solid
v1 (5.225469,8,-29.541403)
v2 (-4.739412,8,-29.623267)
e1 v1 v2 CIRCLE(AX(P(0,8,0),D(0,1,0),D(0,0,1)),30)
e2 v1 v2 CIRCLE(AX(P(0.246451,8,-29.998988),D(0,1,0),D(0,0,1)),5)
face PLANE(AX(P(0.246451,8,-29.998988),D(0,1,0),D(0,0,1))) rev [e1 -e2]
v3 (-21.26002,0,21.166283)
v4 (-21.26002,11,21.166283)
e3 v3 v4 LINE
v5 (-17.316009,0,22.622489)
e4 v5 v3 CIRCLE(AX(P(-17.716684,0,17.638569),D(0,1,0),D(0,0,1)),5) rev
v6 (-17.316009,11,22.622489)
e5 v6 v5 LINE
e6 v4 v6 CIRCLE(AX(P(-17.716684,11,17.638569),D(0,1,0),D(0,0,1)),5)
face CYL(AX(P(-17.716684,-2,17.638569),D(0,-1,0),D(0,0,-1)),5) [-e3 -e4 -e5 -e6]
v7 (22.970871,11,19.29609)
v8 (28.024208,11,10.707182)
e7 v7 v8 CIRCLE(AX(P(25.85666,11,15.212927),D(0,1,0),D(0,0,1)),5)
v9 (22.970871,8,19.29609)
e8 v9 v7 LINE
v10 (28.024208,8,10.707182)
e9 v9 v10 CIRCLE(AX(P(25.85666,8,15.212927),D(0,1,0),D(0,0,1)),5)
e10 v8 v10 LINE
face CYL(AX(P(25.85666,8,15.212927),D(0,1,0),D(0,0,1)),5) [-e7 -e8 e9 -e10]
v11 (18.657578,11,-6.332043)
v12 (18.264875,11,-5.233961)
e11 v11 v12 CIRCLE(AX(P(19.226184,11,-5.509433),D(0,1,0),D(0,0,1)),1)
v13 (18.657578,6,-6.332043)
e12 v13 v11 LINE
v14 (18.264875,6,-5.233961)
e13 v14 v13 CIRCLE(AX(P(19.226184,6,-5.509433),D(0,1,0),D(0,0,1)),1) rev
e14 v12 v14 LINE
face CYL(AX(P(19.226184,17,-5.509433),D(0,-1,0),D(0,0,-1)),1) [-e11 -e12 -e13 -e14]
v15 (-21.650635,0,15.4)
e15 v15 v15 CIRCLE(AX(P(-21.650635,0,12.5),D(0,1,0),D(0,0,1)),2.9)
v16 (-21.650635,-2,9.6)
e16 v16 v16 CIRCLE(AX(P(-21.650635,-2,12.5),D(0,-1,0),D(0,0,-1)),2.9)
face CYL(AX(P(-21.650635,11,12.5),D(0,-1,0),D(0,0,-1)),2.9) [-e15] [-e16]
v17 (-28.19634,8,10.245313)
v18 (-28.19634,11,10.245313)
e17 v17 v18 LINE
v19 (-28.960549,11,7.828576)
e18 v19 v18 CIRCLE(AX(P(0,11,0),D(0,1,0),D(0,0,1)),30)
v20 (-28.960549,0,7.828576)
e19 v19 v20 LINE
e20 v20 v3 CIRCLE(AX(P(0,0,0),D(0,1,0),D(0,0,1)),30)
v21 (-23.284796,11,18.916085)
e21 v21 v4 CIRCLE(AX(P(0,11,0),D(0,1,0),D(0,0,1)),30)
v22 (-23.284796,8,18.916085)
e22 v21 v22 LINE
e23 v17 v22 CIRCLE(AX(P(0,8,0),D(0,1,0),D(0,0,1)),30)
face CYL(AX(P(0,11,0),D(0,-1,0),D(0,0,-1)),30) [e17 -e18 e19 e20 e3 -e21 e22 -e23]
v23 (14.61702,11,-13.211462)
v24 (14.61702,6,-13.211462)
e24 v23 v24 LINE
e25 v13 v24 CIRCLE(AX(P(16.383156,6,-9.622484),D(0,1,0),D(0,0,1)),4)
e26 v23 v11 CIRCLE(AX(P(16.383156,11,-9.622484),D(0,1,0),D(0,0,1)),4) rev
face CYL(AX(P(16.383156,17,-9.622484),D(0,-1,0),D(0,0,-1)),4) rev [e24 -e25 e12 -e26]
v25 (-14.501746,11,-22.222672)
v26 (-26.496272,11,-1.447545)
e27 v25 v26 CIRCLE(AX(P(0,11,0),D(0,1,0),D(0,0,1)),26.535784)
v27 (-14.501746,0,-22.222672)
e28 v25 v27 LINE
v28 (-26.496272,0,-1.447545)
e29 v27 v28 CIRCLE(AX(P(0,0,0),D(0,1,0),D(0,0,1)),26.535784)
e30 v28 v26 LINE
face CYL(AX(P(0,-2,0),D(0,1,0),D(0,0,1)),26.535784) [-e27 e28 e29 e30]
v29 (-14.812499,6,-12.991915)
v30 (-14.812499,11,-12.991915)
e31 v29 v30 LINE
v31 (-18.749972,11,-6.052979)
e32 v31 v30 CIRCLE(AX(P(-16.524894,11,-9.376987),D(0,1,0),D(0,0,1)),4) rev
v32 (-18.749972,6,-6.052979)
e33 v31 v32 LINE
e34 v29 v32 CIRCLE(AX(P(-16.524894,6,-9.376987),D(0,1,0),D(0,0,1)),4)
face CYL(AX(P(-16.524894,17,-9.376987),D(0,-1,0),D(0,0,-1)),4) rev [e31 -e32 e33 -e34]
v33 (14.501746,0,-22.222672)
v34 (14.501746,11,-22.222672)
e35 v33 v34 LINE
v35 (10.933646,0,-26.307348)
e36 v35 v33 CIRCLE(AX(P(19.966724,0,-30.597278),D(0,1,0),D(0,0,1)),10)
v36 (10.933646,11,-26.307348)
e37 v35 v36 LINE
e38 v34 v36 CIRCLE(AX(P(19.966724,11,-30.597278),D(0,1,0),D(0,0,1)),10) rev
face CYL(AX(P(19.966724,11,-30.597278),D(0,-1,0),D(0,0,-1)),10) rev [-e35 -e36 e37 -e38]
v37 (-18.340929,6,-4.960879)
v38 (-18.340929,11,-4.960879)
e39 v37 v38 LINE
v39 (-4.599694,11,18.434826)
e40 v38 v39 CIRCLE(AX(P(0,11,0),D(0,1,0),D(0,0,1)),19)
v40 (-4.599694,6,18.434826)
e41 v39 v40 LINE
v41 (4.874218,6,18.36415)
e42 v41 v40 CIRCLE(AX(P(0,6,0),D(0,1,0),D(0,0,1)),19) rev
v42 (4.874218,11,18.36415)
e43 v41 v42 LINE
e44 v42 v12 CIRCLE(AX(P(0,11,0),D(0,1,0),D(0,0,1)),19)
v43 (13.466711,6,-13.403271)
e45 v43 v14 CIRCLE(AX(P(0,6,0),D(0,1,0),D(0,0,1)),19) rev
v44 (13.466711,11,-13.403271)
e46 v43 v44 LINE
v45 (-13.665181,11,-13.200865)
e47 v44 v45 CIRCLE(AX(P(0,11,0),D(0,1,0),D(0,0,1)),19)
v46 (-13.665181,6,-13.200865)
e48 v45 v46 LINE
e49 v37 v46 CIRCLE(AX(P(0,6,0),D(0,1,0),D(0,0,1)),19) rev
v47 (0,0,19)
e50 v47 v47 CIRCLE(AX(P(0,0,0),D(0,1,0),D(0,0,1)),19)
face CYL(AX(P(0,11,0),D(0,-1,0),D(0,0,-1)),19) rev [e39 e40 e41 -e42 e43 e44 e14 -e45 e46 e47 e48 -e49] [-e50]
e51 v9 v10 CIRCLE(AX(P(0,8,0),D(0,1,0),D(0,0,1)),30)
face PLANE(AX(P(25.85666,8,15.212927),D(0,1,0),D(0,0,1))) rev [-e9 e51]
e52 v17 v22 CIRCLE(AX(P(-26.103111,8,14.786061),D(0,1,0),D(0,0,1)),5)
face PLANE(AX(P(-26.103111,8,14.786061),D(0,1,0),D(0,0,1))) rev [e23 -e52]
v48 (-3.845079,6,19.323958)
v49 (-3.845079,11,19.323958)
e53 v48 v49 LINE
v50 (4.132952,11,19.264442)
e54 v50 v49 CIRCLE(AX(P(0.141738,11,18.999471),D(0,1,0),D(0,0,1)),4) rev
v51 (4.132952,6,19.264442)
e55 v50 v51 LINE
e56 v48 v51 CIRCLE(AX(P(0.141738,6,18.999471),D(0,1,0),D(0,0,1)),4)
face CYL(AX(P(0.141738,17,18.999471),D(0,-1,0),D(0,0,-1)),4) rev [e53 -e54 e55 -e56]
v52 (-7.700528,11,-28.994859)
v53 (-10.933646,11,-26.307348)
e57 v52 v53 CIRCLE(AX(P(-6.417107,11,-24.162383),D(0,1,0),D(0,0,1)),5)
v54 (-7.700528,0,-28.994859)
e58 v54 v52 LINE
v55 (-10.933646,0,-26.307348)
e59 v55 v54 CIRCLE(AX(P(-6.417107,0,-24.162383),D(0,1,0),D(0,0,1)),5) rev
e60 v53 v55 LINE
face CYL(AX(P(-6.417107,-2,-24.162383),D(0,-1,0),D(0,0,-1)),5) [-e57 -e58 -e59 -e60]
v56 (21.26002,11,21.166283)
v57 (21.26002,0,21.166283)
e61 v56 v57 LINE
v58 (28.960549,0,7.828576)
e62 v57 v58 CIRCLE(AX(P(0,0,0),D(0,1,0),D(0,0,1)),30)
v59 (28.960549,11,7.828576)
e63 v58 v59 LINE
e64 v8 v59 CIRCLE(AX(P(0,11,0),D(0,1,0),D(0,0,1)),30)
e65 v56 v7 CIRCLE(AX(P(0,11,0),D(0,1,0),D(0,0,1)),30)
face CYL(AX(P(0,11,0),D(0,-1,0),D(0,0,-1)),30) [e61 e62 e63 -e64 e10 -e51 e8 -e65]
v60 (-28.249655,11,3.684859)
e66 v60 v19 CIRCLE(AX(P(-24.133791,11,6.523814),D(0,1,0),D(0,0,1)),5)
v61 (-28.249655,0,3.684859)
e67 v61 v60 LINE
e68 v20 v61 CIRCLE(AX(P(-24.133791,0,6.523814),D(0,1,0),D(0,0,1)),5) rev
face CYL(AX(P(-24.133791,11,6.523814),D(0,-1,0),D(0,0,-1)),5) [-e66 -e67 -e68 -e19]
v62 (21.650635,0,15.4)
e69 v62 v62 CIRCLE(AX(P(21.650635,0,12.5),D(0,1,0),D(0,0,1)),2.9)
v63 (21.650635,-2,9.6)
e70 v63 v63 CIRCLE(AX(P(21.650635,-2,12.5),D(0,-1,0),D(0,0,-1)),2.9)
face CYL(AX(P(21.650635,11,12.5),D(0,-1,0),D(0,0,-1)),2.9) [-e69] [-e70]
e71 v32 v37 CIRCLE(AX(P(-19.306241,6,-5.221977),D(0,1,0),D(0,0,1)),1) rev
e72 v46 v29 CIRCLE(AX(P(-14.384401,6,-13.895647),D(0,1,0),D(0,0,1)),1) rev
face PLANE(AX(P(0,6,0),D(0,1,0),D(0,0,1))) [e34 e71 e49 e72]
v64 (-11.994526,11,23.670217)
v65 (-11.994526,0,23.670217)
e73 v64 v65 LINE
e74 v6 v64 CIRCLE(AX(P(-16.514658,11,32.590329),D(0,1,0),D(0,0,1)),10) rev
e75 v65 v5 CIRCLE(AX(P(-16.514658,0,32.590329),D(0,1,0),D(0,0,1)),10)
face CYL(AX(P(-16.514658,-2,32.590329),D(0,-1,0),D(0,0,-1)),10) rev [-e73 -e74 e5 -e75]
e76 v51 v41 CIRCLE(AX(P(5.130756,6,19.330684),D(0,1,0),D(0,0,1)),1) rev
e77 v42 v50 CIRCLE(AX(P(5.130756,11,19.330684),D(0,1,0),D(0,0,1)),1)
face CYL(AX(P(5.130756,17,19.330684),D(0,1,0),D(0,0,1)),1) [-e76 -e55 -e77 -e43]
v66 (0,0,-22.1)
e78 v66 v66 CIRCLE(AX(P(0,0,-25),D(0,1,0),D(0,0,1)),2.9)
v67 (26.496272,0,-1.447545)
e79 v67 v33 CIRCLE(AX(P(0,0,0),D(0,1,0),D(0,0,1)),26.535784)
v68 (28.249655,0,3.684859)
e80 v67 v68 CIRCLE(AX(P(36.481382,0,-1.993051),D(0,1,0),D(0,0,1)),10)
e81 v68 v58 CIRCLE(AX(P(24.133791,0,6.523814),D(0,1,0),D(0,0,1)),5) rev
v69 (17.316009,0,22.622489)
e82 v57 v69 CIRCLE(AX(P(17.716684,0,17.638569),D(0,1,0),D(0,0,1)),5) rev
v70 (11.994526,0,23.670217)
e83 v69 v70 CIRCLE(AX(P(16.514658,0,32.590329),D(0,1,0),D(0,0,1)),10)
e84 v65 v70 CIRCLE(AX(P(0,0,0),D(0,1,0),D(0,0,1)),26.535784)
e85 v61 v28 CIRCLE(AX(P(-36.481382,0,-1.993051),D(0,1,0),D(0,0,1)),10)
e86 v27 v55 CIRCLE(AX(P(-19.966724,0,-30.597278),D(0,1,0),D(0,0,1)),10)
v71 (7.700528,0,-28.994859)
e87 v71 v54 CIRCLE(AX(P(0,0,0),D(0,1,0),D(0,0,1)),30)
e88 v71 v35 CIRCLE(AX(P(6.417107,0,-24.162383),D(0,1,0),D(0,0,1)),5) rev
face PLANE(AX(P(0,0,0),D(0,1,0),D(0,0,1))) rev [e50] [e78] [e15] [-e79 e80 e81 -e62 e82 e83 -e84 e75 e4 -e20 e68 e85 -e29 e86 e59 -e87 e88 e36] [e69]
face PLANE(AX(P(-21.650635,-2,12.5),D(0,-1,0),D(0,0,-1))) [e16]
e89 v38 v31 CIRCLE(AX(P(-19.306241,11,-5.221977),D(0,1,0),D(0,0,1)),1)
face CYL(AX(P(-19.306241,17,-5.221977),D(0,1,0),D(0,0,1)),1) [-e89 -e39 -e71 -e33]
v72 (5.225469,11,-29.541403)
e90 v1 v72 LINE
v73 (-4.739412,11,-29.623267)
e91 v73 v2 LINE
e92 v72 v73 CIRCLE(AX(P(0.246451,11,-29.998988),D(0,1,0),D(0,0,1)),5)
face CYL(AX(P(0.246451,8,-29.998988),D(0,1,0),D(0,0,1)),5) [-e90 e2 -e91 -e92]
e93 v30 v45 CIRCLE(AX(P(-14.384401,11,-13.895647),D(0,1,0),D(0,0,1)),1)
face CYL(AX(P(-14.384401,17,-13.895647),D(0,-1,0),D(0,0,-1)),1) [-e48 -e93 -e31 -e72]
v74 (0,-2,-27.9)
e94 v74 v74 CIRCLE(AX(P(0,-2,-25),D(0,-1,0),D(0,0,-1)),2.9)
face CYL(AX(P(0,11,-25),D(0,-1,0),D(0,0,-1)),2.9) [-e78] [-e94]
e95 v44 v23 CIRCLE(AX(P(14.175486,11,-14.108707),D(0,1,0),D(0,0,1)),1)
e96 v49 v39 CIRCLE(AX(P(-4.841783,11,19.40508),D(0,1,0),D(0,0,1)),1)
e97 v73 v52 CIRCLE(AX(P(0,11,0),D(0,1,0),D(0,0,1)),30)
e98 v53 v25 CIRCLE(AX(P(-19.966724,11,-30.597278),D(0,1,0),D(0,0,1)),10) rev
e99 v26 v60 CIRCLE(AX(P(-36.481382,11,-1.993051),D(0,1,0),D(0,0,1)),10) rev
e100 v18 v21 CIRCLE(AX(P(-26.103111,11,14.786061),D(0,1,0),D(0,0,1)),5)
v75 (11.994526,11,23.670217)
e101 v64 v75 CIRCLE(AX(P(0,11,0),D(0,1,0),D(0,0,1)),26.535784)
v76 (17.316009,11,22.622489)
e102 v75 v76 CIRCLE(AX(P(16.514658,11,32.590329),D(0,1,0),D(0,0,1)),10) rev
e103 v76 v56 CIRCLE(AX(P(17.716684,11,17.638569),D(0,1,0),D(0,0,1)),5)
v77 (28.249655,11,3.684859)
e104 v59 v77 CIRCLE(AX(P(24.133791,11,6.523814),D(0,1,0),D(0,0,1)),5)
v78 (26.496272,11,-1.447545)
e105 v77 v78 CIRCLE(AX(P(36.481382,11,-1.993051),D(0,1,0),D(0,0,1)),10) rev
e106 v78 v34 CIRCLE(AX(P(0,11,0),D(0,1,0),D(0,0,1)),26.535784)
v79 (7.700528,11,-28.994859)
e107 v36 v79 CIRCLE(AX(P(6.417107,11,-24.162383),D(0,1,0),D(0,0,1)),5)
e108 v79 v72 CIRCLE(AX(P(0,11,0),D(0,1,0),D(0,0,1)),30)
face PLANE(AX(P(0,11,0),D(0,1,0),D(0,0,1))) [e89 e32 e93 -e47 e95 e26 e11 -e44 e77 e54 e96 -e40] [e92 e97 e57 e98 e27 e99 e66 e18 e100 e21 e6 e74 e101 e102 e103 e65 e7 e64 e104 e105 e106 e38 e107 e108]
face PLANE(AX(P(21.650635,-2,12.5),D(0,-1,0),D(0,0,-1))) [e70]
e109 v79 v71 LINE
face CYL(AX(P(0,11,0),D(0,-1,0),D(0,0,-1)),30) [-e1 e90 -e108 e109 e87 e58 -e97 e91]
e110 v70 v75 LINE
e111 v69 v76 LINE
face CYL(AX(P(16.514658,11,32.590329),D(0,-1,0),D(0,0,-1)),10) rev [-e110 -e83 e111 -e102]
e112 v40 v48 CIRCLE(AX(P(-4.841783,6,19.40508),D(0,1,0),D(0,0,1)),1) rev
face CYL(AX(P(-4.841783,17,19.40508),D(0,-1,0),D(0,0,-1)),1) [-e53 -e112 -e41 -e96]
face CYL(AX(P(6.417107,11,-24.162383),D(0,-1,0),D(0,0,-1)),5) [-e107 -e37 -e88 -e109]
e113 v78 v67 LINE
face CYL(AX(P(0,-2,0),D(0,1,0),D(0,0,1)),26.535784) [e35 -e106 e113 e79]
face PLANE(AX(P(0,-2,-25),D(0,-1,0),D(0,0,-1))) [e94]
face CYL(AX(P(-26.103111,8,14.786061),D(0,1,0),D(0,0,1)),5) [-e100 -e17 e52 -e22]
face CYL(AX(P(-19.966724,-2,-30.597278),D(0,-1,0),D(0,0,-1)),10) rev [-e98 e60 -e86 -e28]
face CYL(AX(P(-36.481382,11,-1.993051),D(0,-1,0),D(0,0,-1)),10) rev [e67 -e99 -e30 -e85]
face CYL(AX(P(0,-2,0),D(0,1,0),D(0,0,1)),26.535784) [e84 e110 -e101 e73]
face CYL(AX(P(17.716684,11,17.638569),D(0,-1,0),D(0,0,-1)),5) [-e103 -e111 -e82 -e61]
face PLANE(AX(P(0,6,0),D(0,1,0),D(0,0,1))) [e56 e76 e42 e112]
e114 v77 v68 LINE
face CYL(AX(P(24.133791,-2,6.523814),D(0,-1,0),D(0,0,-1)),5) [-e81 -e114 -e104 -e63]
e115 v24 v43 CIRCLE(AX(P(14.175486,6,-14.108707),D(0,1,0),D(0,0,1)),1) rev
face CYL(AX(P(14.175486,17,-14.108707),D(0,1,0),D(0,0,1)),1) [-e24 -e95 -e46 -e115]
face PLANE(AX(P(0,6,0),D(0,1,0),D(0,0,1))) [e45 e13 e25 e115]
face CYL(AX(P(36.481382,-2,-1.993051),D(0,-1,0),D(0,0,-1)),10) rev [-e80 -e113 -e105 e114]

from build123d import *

# Parameters (mm, degrees)
SKETCH1_R                = 19
BOSS_EXTRUDE1_DEPTH      = 3.5
SKETCH2_R                = 30
SKETCH2_R_2              = 19
SKETCH2_R_3              = 2.8
BOSS_EXTRUDE2_DEPTH      = 11
BOSS_EXTRUDE3_DEPTH      = 2
BOSS_EXTRUDE3_DEPTH_BACK = 11
SKETCH4_R                = 2.9
SKETCH5_R                = 5
BOSS_EXTRUDE4_DEPTH      = 3
CUT_EXTRUDE1_START       = -10
SKETCH3_R                = 19
CUT_EXTRUDE1_DEPTH       = 10
CUT_EXTRUDE3_START       = -13
CUT_EXTRUDE3_DEPTH       = 13
FILLET1_R                = 10
FILLET2_R                = 5
CUT_EXTRUDE4_START       = -5
SKETCH8_R                = 4
SKETCH8_R_2              = 19
CUT_EXTRUDE4_DEPTH       = 11
FILLET3_R                = 1


with BuildPart() as part:
    # Sketch1 → Boss-Extrude1 (new body)
    with BuildSketch(Plane(origin=(0, 0, 0), x_dir=(1, 0, 0), z_dir=(0, 1, 0))):
        with Locations(Location((0, 0, 0), (0, 0, 270))):
            Circle(SKETCH1_R)
    extrude(amount=BOSS_EXTRUDE1_DEPTH)

    # Sketch2 → Boss-Extrude2 (add)
    with BuildSketch(Plane(origin=(0, 0, 0), x_dir=(1, 0, 0), z_dir=(0, 1, 0))):
        with Locations(Location((0, 0, 0), (0, 0, 270))):
            Circle(SKETCH2_R)
        with Locations(Location((0, 0, 0), (0, 0, 270))):
            Circle(SKETCH2_R_2, mode=Mode.SUBTRACT)
        with Locations(Location((0, 25, 0), (0, 0, 270))):
            Circle(SKETCH2_R_3, mode=Mode.SUBTRACT)
        with Locations(Location((21.650635095, -12.5, 0), (0, 0, 270))):
            Circle(SKETCH2_R_3, mode=Mode.SUBTRACT)
        with Locations(Location((-21.650635095, -12.5, 0), (0, 0, 270))):
            Circle(SKETCH2_R_3, mode=Mode.SUBTRACT)
    extrude(amount=BOSS_EXTRUDE2_DEPTH)

    # Sketch4 → Boss-Extrude3 (add, two sides: drawn at the far end of the back side and taken through both)
    with BuildSketch(Plane.XZ.offset(-BOSS_EXTRUDE3_DEPTH_BACK)):
        with Locations(Location((-21.650635095, 12.5, 0), (0, 0, 270))):
            Circle(SKETCH4_R)
        with Locations(Location((21.650635095, 12.5, 0), (0, 0, 270))):
            Circle(SKETCH4_R)
        with Locations(Location((0, -25, 0), (0, 0, 270))):
            Circle(SKETCH4_R)
    extrude(amount=BOSS_EXTRUDE3_DEPTH + BOSS_EXTRUDE3_DEPTH_BACK)

    # Sketch5 → Boss-Extrude4 (add)
    with BuildSketch(Plane(origin=(0, 11, 0), x_dir=(1, 0, 0), z_dir=(0, 1, 0))):
        with Locations((-26.103110985, -14.7860609)):
            Circle(SKETCH5_R)
        with Locations((0.246451131, 29.99898768)):
            Circle(SKETCH5_R)
        with Locations((25.856659853, -15.212926781)):
            Circle(SKETCH5_R)
    extrude(amount=-BOSS_EXTRUDE4_DEPTH)

    # Sketch3 → Cut-Extrude1 (cut)
    with BuildSketch(Plane(origin=(0, 3.5, 0), x_dir=(1, 0, 0), z_dir=(0, 1, 0)).offset(CUT_EXTRUDE1_START)):
        with Locations(Location((0, 0, 0), (0, 0, 270))):
            Circle(SKETCH3_R)
    extrude(amount=CUT_EXTRUDE1_DEPTH, mode=Mode.SUBTRACT)

    # Sketch7 → Cut-Extrude3 (cut)
    with BuildSketch(Plane(origin=(0, 11, 0), x_dir=(1, 0, 0), z_dir=(0, 1, 0)).offset(CUT_EXTRUDE3_START)):
        with BuildLine():
            ThreePointArc((-29.54423259, -5.20944533), (-25.980762114, 15), (-10.2606043, 28.190778624))
            Line((-10.2606043, 28.190778624), (-13.773984089, 37.84371026))
            Line((-13.773984089, 37.84371026), (-43.939319858, -7.747687605))
            Line((-43.939319858, -7.747687605), (-29.54423259, -5.20944533))
        make_face()
        with BuildLine():
            ThreePointArc((-26.13264562, -4.6078905), (-22.980662881, 13.267891901), (-9.075772579, 24.935480225))
            Line((-9.075772579, 24.935480225), (-10.2606043, 28.190778624))
            ThreePointArc((-10.2606043, 28.190778624), (-25.980762114, 15), (-29.54423259, -5.20944533))
            Line((-29.54423259, -5.20944533), (-26.13264562, -4.6078905))
        make_face()
        with BuildLine():
            Line((15.259965643, 41.926411025), (10.2606043, 28.190778624))
            ThreePointArc((10.2606043, 28.190778624), (25.980762114, 15), (29.54423259, -5.20944533))
            Line((29.54423259, -5.20944533), (39.660606503, -6.993234998))
            Line((39.660606503, -6.993234998), (15.259965643, 41.926411025))
        make_face()
        with BuildLine():
            Line((10.2606043, 28.190778624), (9.075772579, 24.935480225))
            ThreePointArc((9.075772579, 24.935480225), (21.736841548, 15.220300308), (26.535783801, 0))
            ThreePointArc((26.535783801, 0), (26.434807132, -2.312745947), (26.13264562, -4.6078905))
            Line((26.13264562, -4.6078905), (29.54423259, -5.20944533))
            ThreePointArc((29.54423259, -5.20944533), (25.980762114, 15), (10.2606043, 28.190778624))
        make_face()
        with BuildLine():
            Line((28.679354216, -34.17872342), (19.283628291, -22.981333294))
            ThreePointArc((19.283628291, -22.981333294), (0, -30), (-19.283628291, -22.981333294))
            Line((-19.283628291, -22.981333294), (-25.886622414, -30.850475262))
            Line((-25.886622414, -30.850475262), (28.679354216, -34.17872342))
        make_face()
        with BuildLine():
            Line((19.283628291, -22.981333294), (17.056873041, -20.327589725))
            ThreePointArc((17.056873041, -20.327589725), (0, -26.535783801), (-17.056873041, -20.327589725))
            Line((-17.056873041, -20.327589725), (-19.283628291, -22.981333294))
            ThreePointArc((-19.283628291, -22.981333294), (0, -30), (19.283628291, -22.981333294))
        make_face()
    extrude(amount=CUT_EXTRUDE3_DEPTH, mode=Mode.SUBTRACT)

    # Fillet1
    # the kernel refuses this fillet: 10 mm, written as the material it adds along each edge
    with BuildSketch(Plane(origin=(-26.13264562, 0, 4.6078905), x_dir=(-0.9848077530122318, 0, 0.17364817766679624), z_dir=(0, 1, 0)), Plane(origin=(17.056873041, 0, 20.327589725), x_dir=(0.6427876096865569, 0, 0.7660444431189634), z_dir=(0, 1, 0)), Plane(origin=(9.075772579, 0, -24.935480225), x_dir=(0.34202014332561265, 0, -0.9396926207859289), z_dir=(0, 1, 0))) as fillet1_piece_1:
        with BuildLine():
            CenterArc((9.045274498, -8.297697769), FILLET1_R, 123.92490422, 42.948020906)
            Line((-0.693413056, -6.026582466), (-0.888186807, -5.98116016))
            ThreePointArc((-0.888186807, -5.98116016), (-0.372612378, -3.01031053), (-0.2, 0))
            Line((-0.2, 0), (0, 0.2))
            ThreePointArc((0, 0.2), (1.732108099, 0.2), (3.352595033, 0.165953955))
            Line((3.352595033, 0.165953955), (3.464216199, 0))
        make_face()
    extrude(amount=11)
    with BuildSketch(Plane(origin=(-17.056873041, 0, 20.327589725), x_dir=(0.8344973728156843, 0, 0.551011918894429), z_dir=(0, 1, 0)), Plane(origin=(26.13264562, 0, 4.6078905), x_dir=(0.059941633142754296, 0, -0.99820188369697), z_dir=(0, 1, 0)), Plane(origin=(-9.075772579, 0, -24.935480225), x_dir=(-0.8944390059584274, 0, 0.44718996480254386), z_dir=(0, 1, 0))) as fillet1_piece_2:
        with BuildLine():
            CenterArc((7.20939257, -9.934457095), FILLET1_R, 96.563537437, 42.948020906)
            Line((-0.39597707, -3.441510719), (-0.548084463, -3.311651792))
            ThreePointArc((-0.548084463, -3.311651792), (-0.396677677, -1.697894369), (-0.198689142, 0.022860991))
            Line((-0.198689142, 0.022860991), (0.022860991, 0.198689142))
            ThreePointArc((0.022860991, 0.198689142), (3.03317152, 0.026076764), (6.04348205, 0.198689142))
            Line((6.04348205, 0.198689142), (6.06634304, 0))
        make_face()
    extrude(amount=11)

    # Fillet2
    fillet2_edges = [part.edges().sort_by_distance(p)[0] for p in [
        (-10.2606043, 5.5, -28.190778624),
        (-29.54423259, 5.5, 5.20944533),
        (-19.283628291, 5.5, 22.981333294),
        (19.283628291, 5.5, 22.981333294),
        (29.54423259, 5.5, 5.20944533),
        (10.2606043, 5.5, -28.190778624),
    ]]
    fillet(fillet2_edges, radius=FILLET2_R)

    # Sketch8 → Cut-Extrude4 (cut)
    with BuildSketch(Plane(origin=(0, 11, 0), x_dir=(1, 0, 0), z_dir=(0, 1, 0)).offset(CUT_EXTRUDE4_START)):
        with Locations((-16.524893724, 9.376987118)):
            Circle(SKETCH8_R)
        with Locations(Location((0, 0, 0), (0, 0, 42.512080704))):
            Circle(SKETCH8_R_2)
        with Locations((16.383155917, 9.622484201)):
            Circle(SKETCH8_R)
        with Locations((0.141737807, -18.999471319)):
            Circle(SKETCH8_R)
    extrude(amount=CUT_EXTRUDE4_DEPTH, mode=Mode.SUBTRACT)

    # Fillet3
    fillet3_edges = [part.edges().sort_by_distance(p)[0] for p in [
        (4.116263726, 8.5, 18.548756641),
        (-3.83907012, 8.5, 18.608104165),
        (14.005562597, 8.5, -12.839167276),
        (18.034625983, 8.5, -5.979319831),
        (-18.121826323, 8.5, -5.709589366),
        (-14.195555863, 8.5, -12.628784333),
    ]]
    fillet(fillet3_edges, radius=FILLET3_R)


solid = part.part
